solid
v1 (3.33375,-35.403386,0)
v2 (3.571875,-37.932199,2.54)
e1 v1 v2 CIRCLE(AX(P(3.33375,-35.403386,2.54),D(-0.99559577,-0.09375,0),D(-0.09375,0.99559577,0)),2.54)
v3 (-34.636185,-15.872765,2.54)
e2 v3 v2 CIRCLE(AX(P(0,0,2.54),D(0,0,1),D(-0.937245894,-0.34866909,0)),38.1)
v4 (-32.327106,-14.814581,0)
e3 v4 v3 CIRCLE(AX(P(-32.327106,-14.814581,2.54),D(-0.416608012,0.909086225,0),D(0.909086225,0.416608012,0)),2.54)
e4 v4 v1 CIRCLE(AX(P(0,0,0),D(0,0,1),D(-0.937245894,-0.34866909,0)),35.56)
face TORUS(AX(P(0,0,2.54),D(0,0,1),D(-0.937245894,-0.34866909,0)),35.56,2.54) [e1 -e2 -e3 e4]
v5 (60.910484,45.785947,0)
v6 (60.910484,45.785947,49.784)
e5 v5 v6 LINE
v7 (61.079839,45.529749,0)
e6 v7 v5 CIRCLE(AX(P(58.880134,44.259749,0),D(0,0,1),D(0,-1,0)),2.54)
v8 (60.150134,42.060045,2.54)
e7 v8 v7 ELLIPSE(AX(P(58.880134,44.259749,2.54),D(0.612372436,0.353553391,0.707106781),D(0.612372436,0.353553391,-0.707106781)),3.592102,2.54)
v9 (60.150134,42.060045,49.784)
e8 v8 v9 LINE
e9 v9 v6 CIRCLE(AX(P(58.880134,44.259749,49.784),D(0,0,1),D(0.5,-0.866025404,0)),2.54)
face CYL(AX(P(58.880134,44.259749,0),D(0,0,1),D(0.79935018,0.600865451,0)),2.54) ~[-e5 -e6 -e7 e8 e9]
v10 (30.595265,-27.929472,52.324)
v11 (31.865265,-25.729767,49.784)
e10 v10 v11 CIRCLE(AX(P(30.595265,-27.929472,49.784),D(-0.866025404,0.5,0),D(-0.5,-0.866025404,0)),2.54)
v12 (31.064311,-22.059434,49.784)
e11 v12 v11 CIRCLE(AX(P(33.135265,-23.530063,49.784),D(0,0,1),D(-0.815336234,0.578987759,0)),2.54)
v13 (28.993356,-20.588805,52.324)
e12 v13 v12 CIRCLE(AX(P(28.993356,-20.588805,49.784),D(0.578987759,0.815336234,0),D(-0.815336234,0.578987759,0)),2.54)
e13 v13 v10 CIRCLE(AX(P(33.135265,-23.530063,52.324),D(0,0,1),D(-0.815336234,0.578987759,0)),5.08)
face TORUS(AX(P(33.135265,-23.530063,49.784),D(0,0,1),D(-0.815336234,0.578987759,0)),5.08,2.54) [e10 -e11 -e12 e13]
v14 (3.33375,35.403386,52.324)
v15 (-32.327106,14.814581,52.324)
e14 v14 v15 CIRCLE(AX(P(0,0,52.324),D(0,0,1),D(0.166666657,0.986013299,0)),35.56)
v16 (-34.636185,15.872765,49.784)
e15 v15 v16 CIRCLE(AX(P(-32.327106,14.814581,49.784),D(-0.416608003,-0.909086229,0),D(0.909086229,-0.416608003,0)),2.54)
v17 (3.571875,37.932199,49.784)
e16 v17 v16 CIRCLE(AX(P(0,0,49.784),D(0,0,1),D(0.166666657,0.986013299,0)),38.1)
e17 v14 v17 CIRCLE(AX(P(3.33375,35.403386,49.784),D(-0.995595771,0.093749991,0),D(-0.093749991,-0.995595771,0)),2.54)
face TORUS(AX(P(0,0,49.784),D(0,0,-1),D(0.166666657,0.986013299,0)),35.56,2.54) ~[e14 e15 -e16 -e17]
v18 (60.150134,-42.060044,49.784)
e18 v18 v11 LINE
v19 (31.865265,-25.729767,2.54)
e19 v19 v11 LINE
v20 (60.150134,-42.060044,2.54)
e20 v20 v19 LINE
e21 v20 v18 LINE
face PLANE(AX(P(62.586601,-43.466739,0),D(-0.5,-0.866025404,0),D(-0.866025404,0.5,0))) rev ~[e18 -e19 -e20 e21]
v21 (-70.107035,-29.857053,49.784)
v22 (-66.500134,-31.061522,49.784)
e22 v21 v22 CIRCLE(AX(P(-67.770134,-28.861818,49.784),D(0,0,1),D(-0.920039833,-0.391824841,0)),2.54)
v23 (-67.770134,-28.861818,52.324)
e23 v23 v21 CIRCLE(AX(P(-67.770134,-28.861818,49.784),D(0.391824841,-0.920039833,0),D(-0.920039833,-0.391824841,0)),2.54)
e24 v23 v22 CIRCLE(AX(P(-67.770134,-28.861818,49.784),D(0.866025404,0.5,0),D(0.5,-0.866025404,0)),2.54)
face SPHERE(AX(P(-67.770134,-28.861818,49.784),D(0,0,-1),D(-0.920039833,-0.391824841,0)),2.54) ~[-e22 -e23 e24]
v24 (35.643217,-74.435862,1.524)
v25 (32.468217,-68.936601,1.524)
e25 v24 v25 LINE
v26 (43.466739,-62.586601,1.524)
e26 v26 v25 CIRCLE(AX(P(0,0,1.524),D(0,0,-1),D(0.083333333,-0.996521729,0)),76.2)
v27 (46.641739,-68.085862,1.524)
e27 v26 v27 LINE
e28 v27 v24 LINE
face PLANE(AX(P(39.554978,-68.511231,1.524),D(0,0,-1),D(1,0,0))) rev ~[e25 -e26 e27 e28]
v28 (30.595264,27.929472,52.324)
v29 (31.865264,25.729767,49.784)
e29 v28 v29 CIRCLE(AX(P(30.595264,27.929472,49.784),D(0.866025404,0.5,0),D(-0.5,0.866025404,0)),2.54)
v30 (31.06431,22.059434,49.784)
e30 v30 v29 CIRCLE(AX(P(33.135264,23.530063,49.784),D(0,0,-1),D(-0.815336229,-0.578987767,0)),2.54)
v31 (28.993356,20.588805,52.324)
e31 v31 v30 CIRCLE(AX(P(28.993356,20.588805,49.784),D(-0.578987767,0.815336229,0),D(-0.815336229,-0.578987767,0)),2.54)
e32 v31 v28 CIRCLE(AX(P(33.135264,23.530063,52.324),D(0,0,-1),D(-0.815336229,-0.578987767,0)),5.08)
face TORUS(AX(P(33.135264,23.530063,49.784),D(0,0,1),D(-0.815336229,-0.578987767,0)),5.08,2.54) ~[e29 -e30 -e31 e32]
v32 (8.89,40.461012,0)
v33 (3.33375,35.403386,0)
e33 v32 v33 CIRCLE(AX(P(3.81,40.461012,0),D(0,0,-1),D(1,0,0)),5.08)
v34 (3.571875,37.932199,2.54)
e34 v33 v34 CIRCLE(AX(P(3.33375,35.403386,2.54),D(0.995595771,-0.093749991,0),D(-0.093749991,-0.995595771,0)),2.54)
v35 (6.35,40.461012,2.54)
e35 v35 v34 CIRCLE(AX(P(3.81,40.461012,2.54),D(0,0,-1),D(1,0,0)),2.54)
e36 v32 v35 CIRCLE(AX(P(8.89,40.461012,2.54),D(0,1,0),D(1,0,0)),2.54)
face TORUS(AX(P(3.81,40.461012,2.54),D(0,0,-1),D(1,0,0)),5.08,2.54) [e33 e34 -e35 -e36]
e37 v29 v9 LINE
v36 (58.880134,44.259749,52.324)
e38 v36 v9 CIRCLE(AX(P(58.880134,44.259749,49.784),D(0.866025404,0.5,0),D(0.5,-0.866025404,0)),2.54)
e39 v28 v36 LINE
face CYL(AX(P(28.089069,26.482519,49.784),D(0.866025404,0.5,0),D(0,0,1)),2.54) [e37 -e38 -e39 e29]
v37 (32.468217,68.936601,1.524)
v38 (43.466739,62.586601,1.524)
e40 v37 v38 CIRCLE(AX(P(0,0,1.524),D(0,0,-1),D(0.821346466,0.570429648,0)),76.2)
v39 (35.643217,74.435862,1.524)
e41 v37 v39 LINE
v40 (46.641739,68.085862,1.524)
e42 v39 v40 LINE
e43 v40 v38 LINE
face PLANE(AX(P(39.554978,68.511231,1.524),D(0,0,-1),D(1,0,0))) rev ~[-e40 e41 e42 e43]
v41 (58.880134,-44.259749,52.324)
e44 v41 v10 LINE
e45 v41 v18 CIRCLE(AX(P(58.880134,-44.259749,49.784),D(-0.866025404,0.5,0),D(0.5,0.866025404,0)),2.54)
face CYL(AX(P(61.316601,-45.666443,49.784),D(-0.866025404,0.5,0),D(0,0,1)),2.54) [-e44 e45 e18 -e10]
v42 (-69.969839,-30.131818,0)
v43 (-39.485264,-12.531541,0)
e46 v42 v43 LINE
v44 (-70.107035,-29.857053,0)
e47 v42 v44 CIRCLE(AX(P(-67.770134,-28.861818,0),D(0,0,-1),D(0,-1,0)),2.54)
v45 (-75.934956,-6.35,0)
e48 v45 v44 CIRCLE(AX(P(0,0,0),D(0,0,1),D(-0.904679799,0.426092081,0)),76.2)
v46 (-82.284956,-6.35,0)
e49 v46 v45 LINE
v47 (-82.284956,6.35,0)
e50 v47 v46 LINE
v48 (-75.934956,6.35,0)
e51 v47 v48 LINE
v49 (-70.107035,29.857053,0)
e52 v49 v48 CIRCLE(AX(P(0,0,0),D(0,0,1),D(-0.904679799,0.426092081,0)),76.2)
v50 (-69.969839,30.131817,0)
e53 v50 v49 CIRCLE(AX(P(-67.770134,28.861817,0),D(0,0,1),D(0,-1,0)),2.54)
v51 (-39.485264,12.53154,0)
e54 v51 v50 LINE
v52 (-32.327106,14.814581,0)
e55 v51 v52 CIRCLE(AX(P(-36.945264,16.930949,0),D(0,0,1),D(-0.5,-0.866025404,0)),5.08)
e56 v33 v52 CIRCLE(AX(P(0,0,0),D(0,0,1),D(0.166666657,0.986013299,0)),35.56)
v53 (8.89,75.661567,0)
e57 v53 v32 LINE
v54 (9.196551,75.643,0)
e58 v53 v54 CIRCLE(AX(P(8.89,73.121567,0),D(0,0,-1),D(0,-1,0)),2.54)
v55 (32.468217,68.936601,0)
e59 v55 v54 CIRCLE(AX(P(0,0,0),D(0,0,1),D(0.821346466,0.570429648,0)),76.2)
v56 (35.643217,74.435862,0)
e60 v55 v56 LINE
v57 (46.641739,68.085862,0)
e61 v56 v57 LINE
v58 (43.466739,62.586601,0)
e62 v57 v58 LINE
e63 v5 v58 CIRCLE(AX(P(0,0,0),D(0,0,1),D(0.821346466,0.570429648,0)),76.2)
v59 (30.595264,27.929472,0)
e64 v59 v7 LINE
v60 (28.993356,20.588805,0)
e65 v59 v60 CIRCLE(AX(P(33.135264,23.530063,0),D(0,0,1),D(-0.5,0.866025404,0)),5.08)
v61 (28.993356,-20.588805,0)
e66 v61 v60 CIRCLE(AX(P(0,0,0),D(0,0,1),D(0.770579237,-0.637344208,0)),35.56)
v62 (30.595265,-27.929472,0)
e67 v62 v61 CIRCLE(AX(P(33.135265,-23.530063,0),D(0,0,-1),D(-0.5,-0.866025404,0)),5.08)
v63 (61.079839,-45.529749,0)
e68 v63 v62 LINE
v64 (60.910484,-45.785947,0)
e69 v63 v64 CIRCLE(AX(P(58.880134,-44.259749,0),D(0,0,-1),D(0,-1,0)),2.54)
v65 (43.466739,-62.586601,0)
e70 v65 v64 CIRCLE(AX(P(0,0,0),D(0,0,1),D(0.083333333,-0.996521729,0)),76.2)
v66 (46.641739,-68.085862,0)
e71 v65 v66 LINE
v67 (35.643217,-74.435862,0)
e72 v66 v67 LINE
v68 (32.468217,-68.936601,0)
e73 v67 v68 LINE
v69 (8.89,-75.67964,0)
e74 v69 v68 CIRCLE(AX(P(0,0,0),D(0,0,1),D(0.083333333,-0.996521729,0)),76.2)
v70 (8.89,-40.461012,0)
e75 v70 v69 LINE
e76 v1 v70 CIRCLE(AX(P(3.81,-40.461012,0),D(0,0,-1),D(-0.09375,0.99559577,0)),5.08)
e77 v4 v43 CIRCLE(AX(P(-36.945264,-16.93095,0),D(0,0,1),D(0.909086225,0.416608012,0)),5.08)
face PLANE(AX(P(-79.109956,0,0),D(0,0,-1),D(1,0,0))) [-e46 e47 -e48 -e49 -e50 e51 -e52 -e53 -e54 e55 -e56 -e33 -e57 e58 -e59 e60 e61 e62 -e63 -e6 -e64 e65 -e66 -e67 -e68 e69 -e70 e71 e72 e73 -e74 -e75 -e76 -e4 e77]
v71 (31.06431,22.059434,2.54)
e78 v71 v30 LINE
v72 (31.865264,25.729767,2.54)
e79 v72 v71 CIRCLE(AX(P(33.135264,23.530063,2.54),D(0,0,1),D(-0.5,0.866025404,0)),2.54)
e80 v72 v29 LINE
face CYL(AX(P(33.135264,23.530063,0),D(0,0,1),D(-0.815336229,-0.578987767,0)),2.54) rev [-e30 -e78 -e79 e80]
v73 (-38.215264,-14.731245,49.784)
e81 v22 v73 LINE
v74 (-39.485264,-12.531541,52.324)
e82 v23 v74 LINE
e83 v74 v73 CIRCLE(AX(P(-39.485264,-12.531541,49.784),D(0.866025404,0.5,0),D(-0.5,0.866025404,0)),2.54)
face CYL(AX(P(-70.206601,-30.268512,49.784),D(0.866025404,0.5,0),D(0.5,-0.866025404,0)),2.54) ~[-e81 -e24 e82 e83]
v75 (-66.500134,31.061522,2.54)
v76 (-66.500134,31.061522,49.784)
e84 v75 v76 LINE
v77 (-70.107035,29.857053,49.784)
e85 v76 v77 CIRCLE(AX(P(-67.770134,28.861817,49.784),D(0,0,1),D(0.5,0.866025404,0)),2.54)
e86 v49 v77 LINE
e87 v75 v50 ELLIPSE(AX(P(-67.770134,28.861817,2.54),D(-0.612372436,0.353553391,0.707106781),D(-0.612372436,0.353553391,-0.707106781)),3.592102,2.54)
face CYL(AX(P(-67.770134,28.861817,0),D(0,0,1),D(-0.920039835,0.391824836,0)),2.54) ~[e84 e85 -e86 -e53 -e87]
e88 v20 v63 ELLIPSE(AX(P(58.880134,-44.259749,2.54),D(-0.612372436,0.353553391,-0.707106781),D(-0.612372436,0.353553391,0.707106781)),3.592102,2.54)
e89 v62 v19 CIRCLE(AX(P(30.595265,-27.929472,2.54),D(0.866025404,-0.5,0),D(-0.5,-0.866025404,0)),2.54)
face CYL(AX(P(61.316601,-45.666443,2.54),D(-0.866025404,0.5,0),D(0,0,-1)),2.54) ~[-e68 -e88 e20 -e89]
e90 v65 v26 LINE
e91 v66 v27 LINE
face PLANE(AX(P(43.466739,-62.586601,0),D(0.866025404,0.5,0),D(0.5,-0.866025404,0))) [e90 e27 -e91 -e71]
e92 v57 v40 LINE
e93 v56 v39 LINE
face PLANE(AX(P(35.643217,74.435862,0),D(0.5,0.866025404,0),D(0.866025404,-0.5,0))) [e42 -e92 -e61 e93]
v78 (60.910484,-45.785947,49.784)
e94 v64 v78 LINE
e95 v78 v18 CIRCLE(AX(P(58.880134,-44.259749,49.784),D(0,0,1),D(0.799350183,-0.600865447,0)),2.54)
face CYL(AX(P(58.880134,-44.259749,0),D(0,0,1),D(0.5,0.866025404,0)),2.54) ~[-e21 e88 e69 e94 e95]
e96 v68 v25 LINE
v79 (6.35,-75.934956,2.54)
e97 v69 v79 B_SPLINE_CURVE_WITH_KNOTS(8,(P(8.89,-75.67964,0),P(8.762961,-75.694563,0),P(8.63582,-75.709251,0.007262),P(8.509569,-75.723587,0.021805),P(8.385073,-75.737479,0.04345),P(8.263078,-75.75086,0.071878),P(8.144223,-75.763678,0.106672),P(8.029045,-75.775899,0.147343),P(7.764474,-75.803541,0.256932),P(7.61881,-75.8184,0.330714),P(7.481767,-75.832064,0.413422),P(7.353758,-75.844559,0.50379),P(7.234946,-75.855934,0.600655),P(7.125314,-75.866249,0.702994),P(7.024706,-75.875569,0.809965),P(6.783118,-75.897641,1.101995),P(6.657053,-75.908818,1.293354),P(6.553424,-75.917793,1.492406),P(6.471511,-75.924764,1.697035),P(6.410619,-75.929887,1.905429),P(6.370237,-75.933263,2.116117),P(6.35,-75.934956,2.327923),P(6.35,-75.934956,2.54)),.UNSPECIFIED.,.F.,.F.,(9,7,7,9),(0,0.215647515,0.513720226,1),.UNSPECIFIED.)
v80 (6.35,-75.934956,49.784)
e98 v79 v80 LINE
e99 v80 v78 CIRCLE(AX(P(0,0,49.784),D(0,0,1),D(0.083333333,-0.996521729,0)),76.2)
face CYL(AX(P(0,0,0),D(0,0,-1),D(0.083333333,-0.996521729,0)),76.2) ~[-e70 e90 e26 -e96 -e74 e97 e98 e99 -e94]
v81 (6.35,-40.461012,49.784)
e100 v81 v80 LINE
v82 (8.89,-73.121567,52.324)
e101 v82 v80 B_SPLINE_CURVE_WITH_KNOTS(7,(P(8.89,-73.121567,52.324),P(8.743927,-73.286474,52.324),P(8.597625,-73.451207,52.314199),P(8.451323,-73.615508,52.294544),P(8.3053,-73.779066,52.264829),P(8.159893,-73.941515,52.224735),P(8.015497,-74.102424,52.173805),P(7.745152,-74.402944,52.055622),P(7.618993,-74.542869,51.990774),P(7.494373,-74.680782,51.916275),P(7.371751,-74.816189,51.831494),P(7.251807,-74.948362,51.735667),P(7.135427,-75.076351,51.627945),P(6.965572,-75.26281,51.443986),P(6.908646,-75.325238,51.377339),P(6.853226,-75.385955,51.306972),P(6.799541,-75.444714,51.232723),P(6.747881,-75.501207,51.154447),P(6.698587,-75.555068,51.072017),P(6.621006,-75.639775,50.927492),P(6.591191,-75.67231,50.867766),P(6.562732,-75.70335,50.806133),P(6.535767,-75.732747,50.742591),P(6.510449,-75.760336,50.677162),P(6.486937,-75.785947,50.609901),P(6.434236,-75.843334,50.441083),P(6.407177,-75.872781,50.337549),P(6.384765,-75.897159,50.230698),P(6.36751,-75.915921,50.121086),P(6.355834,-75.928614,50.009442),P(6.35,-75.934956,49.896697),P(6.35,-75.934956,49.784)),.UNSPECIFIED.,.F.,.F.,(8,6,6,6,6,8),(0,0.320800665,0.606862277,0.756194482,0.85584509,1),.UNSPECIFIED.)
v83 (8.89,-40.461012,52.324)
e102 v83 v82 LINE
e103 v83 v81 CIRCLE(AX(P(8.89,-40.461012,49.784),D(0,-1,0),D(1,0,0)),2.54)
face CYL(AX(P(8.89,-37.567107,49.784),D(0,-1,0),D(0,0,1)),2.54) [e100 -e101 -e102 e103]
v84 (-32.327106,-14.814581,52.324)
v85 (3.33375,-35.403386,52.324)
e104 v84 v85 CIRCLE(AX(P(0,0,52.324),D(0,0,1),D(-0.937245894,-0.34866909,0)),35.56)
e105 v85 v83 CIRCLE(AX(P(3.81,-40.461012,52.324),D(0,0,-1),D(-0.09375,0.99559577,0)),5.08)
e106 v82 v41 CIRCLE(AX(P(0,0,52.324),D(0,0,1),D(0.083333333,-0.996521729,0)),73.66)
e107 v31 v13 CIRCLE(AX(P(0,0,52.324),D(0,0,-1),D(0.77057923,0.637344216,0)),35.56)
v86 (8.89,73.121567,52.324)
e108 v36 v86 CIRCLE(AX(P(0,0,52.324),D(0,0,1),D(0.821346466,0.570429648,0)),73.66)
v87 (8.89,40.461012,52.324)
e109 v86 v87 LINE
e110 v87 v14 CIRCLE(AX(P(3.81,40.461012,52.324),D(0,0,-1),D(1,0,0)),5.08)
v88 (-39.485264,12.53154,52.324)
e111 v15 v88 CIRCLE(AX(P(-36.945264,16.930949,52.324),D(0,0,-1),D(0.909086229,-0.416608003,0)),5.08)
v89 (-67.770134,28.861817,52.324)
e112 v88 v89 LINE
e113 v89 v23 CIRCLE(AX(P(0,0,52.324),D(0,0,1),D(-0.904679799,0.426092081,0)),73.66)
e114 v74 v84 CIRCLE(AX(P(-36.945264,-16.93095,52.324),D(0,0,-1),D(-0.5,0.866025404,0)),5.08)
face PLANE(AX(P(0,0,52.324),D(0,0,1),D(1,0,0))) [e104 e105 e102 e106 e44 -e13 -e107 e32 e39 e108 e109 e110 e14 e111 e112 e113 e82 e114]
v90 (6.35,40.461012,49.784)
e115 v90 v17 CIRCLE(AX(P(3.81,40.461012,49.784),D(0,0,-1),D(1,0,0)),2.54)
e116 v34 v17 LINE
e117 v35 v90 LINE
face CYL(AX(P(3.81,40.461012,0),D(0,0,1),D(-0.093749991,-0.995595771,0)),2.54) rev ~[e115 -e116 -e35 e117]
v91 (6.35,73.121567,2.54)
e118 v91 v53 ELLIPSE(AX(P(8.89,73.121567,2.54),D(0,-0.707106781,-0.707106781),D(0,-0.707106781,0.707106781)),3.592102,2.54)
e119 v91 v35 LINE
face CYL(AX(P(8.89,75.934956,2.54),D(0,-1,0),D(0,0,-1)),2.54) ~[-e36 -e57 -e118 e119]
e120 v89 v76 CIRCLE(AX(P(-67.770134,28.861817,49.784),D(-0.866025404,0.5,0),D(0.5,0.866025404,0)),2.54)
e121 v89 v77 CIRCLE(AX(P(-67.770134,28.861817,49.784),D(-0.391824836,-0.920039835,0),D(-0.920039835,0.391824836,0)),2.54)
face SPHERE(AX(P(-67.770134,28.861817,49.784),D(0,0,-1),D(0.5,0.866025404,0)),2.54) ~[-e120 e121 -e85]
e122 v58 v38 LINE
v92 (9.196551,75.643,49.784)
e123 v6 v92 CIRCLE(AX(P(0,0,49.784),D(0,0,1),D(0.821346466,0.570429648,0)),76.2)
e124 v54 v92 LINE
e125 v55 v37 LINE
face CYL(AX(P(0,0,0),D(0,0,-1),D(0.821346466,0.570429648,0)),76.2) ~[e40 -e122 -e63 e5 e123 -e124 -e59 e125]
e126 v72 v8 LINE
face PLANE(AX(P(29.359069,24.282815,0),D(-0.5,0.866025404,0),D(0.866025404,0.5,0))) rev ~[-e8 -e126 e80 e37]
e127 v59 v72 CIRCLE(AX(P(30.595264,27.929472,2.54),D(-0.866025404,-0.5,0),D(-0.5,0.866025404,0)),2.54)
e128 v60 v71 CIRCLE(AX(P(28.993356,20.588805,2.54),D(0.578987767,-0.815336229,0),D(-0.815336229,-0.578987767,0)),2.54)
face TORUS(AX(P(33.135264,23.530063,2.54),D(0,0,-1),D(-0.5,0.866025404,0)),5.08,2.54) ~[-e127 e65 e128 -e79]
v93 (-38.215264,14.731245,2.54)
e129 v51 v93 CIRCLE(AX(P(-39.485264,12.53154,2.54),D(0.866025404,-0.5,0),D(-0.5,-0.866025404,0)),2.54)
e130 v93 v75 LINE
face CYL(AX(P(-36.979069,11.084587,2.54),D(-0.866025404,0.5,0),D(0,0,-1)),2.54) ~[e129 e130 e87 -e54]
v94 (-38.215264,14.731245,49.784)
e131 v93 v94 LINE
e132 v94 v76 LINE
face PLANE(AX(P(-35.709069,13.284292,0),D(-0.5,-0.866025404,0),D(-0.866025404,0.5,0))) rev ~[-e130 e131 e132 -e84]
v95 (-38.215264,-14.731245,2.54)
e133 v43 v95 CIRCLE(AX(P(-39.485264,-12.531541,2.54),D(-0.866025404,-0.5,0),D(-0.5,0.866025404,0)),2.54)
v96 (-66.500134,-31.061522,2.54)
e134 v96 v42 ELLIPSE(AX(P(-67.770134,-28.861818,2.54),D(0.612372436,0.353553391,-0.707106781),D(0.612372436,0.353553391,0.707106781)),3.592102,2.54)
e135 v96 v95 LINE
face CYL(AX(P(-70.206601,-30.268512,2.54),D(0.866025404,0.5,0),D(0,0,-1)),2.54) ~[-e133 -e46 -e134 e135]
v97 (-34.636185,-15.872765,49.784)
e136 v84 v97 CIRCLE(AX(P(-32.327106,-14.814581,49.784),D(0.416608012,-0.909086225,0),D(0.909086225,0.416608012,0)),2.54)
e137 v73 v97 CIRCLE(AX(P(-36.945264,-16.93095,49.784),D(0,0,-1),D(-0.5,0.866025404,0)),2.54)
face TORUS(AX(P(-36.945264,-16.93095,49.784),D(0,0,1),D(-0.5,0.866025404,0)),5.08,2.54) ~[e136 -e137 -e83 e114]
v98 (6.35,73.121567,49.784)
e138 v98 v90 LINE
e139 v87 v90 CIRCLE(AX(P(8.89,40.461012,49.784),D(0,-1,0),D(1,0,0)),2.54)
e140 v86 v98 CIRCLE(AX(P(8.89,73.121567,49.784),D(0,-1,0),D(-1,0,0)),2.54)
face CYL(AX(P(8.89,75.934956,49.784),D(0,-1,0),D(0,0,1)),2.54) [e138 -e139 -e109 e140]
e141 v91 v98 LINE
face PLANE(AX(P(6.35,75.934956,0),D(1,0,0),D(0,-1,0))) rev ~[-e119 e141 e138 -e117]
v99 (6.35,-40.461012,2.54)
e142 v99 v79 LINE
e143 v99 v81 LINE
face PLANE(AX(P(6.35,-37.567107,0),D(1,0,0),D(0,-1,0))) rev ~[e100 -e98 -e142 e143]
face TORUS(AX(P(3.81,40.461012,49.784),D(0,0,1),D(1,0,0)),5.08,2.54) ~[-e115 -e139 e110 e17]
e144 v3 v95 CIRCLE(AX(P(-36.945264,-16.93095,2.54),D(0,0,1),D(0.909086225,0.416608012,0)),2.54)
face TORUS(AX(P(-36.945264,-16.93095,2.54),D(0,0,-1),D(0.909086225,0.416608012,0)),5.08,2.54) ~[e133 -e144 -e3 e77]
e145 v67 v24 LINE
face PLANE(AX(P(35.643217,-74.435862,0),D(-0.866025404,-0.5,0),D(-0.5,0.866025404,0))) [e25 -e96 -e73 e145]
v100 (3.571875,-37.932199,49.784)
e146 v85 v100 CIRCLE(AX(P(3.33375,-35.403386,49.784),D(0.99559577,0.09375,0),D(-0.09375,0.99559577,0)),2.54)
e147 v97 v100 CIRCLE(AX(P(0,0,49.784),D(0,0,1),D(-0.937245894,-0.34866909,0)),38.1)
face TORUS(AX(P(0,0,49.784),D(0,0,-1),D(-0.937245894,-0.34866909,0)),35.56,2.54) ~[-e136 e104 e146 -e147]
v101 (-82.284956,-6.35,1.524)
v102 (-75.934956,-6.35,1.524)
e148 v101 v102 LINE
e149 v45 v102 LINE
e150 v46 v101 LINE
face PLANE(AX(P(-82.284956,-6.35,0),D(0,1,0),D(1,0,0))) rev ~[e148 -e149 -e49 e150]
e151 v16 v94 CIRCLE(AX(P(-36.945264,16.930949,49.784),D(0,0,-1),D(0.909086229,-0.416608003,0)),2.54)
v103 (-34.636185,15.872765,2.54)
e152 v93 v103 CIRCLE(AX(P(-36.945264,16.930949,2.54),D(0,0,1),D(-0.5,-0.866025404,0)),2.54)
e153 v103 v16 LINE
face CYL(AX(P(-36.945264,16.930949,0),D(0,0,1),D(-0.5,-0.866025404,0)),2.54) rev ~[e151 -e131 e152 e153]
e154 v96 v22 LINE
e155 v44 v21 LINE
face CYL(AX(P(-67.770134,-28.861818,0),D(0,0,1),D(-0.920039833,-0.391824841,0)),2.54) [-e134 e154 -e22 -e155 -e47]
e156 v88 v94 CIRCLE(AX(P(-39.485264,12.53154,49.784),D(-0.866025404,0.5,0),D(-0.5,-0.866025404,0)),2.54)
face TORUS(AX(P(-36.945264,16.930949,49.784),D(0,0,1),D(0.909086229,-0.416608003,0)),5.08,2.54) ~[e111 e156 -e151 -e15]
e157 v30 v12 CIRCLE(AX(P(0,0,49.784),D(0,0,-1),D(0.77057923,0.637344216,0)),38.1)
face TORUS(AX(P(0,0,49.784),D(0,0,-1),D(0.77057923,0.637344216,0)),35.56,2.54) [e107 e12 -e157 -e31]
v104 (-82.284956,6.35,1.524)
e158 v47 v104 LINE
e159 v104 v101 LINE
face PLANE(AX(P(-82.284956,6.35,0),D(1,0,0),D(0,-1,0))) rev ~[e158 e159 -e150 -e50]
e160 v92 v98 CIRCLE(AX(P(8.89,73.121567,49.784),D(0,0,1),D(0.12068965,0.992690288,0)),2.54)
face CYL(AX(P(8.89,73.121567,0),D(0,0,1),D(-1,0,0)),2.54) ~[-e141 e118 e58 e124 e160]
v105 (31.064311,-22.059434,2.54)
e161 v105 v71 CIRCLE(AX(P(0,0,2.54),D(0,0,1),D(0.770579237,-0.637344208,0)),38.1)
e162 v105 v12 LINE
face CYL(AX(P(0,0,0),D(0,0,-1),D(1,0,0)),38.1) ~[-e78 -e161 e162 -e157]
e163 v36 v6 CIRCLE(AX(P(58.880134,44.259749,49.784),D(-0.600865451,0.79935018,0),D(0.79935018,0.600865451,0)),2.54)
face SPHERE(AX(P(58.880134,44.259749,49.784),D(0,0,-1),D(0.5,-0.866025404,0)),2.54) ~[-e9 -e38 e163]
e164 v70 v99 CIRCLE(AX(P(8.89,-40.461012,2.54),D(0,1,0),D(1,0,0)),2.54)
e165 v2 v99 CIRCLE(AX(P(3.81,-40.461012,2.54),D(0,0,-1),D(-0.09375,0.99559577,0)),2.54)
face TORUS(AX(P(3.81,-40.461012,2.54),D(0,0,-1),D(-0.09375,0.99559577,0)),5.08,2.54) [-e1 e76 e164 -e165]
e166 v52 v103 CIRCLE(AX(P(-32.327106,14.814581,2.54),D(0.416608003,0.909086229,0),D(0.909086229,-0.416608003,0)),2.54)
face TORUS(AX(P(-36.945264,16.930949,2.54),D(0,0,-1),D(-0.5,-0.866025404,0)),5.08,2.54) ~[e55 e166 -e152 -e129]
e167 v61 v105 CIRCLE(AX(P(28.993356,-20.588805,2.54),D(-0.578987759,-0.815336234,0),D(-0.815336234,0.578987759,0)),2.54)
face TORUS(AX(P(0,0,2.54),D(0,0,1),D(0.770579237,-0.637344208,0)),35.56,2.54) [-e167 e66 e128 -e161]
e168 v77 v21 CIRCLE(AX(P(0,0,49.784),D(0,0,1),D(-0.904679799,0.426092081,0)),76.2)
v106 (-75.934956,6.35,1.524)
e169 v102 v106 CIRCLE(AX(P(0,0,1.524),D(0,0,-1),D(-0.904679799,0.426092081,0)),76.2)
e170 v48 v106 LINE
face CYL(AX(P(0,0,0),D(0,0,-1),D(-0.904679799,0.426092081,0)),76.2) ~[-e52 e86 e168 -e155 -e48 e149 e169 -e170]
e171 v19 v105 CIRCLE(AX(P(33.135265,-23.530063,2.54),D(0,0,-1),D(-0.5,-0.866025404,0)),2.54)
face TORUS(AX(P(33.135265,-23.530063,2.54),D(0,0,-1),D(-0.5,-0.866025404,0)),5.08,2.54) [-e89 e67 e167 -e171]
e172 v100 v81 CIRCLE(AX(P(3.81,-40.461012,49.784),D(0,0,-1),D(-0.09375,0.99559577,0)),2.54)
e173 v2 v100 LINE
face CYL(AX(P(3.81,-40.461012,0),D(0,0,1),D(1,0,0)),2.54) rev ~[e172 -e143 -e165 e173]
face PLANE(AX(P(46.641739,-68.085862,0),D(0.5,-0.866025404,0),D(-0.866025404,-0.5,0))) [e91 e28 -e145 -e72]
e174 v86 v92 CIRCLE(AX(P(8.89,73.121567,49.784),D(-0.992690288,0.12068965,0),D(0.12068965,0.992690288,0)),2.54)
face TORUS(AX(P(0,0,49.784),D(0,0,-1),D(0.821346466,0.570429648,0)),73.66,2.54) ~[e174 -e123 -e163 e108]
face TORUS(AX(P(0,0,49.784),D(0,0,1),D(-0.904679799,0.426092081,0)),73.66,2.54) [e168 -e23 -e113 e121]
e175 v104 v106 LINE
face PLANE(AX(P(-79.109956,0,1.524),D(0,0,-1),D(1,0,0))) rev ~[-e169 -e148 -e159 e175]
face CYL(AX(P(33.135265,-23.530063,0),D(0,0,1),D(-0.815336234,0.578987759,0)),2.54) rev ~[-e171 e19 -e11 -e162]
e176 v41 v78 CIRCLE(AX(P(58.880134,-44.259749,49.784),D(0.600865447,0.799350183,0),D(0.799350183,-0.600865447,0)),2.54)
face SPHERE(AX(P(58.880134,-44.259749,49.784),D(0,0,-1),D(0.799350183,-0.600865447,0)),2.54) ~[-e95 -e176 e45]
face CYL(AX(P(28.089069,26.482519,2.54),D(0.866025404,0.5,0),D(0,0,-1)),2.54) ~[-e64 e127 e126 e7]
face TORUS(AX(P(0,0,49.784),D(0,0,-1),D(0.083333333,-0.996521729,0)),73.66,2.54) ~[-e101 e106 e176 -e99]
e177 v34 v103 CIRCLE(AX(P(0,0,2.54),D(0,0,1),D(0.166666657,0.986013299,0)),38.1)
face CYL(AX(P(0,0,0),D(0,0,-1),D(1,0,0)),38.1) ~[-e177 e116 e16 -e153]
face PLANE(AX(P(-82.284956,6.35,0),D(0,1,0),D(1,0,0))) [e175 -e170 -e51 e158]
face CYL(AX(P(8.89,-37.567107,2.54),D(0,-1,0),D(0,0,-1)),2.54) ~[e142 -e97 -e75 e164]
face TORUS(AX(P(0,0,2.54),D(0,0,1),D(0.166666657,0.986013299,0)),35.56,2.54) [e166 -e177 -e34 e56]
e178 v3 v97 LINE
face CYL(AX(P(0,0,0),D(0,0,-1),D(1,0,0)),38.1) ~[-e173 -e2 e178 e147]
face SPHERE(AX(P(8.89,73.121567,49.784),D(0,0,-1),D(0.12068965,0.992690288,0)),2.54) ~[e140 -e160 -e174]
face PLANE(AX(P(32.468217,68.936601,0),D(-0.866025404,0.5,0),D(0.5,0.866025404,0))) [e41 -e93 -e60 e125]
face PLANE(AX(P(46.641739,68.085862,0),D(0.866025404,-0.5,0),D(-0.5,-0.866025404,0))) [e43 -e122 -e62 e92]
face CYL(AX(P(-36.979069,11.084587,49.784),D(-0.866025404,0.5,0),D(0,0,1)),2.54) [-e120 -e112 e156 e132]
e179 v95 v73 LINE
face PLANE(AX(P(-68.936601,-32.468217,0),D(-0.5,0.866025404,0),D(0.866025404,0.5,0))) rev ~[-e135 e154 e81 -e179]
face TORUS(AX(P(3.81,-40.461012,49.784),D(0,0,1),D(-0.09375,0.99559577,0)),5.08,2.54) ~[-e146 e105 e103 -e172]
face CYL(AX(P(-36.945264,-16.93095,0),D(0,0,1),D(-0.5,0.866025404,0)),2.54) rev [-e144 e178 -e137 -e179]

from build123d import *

# Parameters (mm, degrees)
F0_R     = 38.1
F1_DEPTH = 52.324
F3_DEPTH = 52.324
F4_W     = 6.35
F4_H     = 12.7
F5_DEPTH = 1.524
F6_R     = 2.54


with BuildPart() as f1:
    # F0 (on Top) → F1 (new body)
    with BuildSketch(Plane.XY):
        Circle(F0_R)
    extrude(amount=F1_DEPTH)

    # F2 (on Top) → F3 (join, through all)
    with BuildSketch(Plane.XY):
        with BuildLine():
            Line((6.35, -37.5671066227), (6.35, -75.9349557187))
            ThreePointArc((6.35, -75.9349557187), (38.1000001588, -65.9911356767), (62.5866008968, -43.4667388722))
            Line((62.5866008968, -43.4667388722), (29.3590689181, -24.2828143398))
            ThreePointArc((29.3590689181, -24.2828143398), (19.0500001605, -32.9955677915), (6.35, -37.5671066227))
        make_face()
        with BuildLine():
            ThreePointArc((6.3499996346, 37.5671066844), (19.0499998395, 32.9955679768), (29.3590686819, 24.2828146254))
            Line((29.3590686819, 24.2828146254), (62.5866006876, 43.4667391734))
            ThreePointArc((62.5866006876, 43.4667391734), (38.0999998412, 65.99113586), (6.3499996346, 75.9349557492))
            Line((6.3499996346, 75.9349557492), (6.3499996346, 37.5671066844))
        make_face()
        with BuildLine():
            ThreePointArc((-35.7090685527, -13.2842923446), (-38.1, -1.853e-07), (-35.7090686819, 13.2842919973))
            Line((-35.7090686819, 13.2842919973), (-68.9366006876, 32.4682165453))
            ThreePointArc((-68.9366006876, 32.4682165453), (-76.2, -1.833e-07), (-68.9366005314, -32.468216877))
            Line((-68.9366005314, -32.468216877), (-35.7090685527, -13.2842923446))
        make_face()
    extrude(amount=F3_DEPTH)

    # F4 (on face) → F5 (join)
    with BuildSketch(Plane(origin=(0, 0, 0), x_dir=(1, 0, 0), z_dir=(0, 0, -1))):
        with Locations((-79.1099557187, 0)):
            Rectangle(F4_W, F4_H)
        Polygon((43.4667391734, -62.5866006876), (32.4682165453, -68.9366006876), (35.6432165453, -74.4358620017), (46.6417391734, -68.0858620017), align=None)
        Polygon((32.4682165453, 68.9366006876), (43.4667391734, 62.5866006876), (46.6417391734, 68.0858620017), (35.6432165453, 74.4358620017), align=None)
    extrude(amount=-F5_DEPTH)

    # F6
    f6_edges = [f1.edges().sort_by_distance(p)[0] for p in [
        (38.1, 0, 52.324),
        (45.972835, 33.874777, 52.324),
        (38.1, 65.991136, 52.324),
        (6.35, 56.751031, 52.324),
        (-19.05, 32.995568, 52.324),
        (-52.322835, 22.876254, 52.324),
        (-76.2, 0, 52.324),
        (-52.322835, -22.876255, 52.324),
        (-19.05, -32.995568, 52.324),
        (6.35, -56.751031, 52.324),
        (38.1, -65.991136, 52.324),
        (45.972835, -33.874777, 52.324),
        (6.35, -37.567107, 26.162),
        (-35.709069, -13.284292, 26.162),
        (-19.05, -32.995568, 0),
        (-68.936601, -32.468217, 26.162),
        (-19.05, 32.995568, 0),
        (-35.709069, 13.284292, 26.162),
        (6.35, 37.567107, 26.162),
        (-68.936601, 32.468217, 26.162),
        (6.35, 75.934956, 26.162),
        (38.1, 0, 0),
        (29.359069, -24.282814, 26.162),
        (29.359069, 24.282815, 26.162),
        (62.586601, 43.466739, 26.162),
        (62.586601, -43.466739, 26.162),
        (45.972835, 33.874777, 0),
        (6.35, 56.751031, 0),
        (-52.322835, 22.876254, 0),
        (-52.322835, -22.876255, 0),
        (6.35, -56.751031, 0),
        (45.972835, -33.874777, 0),
    ]]
    fillet(f6_edges, radius=F6_R)


solid = f1.part
